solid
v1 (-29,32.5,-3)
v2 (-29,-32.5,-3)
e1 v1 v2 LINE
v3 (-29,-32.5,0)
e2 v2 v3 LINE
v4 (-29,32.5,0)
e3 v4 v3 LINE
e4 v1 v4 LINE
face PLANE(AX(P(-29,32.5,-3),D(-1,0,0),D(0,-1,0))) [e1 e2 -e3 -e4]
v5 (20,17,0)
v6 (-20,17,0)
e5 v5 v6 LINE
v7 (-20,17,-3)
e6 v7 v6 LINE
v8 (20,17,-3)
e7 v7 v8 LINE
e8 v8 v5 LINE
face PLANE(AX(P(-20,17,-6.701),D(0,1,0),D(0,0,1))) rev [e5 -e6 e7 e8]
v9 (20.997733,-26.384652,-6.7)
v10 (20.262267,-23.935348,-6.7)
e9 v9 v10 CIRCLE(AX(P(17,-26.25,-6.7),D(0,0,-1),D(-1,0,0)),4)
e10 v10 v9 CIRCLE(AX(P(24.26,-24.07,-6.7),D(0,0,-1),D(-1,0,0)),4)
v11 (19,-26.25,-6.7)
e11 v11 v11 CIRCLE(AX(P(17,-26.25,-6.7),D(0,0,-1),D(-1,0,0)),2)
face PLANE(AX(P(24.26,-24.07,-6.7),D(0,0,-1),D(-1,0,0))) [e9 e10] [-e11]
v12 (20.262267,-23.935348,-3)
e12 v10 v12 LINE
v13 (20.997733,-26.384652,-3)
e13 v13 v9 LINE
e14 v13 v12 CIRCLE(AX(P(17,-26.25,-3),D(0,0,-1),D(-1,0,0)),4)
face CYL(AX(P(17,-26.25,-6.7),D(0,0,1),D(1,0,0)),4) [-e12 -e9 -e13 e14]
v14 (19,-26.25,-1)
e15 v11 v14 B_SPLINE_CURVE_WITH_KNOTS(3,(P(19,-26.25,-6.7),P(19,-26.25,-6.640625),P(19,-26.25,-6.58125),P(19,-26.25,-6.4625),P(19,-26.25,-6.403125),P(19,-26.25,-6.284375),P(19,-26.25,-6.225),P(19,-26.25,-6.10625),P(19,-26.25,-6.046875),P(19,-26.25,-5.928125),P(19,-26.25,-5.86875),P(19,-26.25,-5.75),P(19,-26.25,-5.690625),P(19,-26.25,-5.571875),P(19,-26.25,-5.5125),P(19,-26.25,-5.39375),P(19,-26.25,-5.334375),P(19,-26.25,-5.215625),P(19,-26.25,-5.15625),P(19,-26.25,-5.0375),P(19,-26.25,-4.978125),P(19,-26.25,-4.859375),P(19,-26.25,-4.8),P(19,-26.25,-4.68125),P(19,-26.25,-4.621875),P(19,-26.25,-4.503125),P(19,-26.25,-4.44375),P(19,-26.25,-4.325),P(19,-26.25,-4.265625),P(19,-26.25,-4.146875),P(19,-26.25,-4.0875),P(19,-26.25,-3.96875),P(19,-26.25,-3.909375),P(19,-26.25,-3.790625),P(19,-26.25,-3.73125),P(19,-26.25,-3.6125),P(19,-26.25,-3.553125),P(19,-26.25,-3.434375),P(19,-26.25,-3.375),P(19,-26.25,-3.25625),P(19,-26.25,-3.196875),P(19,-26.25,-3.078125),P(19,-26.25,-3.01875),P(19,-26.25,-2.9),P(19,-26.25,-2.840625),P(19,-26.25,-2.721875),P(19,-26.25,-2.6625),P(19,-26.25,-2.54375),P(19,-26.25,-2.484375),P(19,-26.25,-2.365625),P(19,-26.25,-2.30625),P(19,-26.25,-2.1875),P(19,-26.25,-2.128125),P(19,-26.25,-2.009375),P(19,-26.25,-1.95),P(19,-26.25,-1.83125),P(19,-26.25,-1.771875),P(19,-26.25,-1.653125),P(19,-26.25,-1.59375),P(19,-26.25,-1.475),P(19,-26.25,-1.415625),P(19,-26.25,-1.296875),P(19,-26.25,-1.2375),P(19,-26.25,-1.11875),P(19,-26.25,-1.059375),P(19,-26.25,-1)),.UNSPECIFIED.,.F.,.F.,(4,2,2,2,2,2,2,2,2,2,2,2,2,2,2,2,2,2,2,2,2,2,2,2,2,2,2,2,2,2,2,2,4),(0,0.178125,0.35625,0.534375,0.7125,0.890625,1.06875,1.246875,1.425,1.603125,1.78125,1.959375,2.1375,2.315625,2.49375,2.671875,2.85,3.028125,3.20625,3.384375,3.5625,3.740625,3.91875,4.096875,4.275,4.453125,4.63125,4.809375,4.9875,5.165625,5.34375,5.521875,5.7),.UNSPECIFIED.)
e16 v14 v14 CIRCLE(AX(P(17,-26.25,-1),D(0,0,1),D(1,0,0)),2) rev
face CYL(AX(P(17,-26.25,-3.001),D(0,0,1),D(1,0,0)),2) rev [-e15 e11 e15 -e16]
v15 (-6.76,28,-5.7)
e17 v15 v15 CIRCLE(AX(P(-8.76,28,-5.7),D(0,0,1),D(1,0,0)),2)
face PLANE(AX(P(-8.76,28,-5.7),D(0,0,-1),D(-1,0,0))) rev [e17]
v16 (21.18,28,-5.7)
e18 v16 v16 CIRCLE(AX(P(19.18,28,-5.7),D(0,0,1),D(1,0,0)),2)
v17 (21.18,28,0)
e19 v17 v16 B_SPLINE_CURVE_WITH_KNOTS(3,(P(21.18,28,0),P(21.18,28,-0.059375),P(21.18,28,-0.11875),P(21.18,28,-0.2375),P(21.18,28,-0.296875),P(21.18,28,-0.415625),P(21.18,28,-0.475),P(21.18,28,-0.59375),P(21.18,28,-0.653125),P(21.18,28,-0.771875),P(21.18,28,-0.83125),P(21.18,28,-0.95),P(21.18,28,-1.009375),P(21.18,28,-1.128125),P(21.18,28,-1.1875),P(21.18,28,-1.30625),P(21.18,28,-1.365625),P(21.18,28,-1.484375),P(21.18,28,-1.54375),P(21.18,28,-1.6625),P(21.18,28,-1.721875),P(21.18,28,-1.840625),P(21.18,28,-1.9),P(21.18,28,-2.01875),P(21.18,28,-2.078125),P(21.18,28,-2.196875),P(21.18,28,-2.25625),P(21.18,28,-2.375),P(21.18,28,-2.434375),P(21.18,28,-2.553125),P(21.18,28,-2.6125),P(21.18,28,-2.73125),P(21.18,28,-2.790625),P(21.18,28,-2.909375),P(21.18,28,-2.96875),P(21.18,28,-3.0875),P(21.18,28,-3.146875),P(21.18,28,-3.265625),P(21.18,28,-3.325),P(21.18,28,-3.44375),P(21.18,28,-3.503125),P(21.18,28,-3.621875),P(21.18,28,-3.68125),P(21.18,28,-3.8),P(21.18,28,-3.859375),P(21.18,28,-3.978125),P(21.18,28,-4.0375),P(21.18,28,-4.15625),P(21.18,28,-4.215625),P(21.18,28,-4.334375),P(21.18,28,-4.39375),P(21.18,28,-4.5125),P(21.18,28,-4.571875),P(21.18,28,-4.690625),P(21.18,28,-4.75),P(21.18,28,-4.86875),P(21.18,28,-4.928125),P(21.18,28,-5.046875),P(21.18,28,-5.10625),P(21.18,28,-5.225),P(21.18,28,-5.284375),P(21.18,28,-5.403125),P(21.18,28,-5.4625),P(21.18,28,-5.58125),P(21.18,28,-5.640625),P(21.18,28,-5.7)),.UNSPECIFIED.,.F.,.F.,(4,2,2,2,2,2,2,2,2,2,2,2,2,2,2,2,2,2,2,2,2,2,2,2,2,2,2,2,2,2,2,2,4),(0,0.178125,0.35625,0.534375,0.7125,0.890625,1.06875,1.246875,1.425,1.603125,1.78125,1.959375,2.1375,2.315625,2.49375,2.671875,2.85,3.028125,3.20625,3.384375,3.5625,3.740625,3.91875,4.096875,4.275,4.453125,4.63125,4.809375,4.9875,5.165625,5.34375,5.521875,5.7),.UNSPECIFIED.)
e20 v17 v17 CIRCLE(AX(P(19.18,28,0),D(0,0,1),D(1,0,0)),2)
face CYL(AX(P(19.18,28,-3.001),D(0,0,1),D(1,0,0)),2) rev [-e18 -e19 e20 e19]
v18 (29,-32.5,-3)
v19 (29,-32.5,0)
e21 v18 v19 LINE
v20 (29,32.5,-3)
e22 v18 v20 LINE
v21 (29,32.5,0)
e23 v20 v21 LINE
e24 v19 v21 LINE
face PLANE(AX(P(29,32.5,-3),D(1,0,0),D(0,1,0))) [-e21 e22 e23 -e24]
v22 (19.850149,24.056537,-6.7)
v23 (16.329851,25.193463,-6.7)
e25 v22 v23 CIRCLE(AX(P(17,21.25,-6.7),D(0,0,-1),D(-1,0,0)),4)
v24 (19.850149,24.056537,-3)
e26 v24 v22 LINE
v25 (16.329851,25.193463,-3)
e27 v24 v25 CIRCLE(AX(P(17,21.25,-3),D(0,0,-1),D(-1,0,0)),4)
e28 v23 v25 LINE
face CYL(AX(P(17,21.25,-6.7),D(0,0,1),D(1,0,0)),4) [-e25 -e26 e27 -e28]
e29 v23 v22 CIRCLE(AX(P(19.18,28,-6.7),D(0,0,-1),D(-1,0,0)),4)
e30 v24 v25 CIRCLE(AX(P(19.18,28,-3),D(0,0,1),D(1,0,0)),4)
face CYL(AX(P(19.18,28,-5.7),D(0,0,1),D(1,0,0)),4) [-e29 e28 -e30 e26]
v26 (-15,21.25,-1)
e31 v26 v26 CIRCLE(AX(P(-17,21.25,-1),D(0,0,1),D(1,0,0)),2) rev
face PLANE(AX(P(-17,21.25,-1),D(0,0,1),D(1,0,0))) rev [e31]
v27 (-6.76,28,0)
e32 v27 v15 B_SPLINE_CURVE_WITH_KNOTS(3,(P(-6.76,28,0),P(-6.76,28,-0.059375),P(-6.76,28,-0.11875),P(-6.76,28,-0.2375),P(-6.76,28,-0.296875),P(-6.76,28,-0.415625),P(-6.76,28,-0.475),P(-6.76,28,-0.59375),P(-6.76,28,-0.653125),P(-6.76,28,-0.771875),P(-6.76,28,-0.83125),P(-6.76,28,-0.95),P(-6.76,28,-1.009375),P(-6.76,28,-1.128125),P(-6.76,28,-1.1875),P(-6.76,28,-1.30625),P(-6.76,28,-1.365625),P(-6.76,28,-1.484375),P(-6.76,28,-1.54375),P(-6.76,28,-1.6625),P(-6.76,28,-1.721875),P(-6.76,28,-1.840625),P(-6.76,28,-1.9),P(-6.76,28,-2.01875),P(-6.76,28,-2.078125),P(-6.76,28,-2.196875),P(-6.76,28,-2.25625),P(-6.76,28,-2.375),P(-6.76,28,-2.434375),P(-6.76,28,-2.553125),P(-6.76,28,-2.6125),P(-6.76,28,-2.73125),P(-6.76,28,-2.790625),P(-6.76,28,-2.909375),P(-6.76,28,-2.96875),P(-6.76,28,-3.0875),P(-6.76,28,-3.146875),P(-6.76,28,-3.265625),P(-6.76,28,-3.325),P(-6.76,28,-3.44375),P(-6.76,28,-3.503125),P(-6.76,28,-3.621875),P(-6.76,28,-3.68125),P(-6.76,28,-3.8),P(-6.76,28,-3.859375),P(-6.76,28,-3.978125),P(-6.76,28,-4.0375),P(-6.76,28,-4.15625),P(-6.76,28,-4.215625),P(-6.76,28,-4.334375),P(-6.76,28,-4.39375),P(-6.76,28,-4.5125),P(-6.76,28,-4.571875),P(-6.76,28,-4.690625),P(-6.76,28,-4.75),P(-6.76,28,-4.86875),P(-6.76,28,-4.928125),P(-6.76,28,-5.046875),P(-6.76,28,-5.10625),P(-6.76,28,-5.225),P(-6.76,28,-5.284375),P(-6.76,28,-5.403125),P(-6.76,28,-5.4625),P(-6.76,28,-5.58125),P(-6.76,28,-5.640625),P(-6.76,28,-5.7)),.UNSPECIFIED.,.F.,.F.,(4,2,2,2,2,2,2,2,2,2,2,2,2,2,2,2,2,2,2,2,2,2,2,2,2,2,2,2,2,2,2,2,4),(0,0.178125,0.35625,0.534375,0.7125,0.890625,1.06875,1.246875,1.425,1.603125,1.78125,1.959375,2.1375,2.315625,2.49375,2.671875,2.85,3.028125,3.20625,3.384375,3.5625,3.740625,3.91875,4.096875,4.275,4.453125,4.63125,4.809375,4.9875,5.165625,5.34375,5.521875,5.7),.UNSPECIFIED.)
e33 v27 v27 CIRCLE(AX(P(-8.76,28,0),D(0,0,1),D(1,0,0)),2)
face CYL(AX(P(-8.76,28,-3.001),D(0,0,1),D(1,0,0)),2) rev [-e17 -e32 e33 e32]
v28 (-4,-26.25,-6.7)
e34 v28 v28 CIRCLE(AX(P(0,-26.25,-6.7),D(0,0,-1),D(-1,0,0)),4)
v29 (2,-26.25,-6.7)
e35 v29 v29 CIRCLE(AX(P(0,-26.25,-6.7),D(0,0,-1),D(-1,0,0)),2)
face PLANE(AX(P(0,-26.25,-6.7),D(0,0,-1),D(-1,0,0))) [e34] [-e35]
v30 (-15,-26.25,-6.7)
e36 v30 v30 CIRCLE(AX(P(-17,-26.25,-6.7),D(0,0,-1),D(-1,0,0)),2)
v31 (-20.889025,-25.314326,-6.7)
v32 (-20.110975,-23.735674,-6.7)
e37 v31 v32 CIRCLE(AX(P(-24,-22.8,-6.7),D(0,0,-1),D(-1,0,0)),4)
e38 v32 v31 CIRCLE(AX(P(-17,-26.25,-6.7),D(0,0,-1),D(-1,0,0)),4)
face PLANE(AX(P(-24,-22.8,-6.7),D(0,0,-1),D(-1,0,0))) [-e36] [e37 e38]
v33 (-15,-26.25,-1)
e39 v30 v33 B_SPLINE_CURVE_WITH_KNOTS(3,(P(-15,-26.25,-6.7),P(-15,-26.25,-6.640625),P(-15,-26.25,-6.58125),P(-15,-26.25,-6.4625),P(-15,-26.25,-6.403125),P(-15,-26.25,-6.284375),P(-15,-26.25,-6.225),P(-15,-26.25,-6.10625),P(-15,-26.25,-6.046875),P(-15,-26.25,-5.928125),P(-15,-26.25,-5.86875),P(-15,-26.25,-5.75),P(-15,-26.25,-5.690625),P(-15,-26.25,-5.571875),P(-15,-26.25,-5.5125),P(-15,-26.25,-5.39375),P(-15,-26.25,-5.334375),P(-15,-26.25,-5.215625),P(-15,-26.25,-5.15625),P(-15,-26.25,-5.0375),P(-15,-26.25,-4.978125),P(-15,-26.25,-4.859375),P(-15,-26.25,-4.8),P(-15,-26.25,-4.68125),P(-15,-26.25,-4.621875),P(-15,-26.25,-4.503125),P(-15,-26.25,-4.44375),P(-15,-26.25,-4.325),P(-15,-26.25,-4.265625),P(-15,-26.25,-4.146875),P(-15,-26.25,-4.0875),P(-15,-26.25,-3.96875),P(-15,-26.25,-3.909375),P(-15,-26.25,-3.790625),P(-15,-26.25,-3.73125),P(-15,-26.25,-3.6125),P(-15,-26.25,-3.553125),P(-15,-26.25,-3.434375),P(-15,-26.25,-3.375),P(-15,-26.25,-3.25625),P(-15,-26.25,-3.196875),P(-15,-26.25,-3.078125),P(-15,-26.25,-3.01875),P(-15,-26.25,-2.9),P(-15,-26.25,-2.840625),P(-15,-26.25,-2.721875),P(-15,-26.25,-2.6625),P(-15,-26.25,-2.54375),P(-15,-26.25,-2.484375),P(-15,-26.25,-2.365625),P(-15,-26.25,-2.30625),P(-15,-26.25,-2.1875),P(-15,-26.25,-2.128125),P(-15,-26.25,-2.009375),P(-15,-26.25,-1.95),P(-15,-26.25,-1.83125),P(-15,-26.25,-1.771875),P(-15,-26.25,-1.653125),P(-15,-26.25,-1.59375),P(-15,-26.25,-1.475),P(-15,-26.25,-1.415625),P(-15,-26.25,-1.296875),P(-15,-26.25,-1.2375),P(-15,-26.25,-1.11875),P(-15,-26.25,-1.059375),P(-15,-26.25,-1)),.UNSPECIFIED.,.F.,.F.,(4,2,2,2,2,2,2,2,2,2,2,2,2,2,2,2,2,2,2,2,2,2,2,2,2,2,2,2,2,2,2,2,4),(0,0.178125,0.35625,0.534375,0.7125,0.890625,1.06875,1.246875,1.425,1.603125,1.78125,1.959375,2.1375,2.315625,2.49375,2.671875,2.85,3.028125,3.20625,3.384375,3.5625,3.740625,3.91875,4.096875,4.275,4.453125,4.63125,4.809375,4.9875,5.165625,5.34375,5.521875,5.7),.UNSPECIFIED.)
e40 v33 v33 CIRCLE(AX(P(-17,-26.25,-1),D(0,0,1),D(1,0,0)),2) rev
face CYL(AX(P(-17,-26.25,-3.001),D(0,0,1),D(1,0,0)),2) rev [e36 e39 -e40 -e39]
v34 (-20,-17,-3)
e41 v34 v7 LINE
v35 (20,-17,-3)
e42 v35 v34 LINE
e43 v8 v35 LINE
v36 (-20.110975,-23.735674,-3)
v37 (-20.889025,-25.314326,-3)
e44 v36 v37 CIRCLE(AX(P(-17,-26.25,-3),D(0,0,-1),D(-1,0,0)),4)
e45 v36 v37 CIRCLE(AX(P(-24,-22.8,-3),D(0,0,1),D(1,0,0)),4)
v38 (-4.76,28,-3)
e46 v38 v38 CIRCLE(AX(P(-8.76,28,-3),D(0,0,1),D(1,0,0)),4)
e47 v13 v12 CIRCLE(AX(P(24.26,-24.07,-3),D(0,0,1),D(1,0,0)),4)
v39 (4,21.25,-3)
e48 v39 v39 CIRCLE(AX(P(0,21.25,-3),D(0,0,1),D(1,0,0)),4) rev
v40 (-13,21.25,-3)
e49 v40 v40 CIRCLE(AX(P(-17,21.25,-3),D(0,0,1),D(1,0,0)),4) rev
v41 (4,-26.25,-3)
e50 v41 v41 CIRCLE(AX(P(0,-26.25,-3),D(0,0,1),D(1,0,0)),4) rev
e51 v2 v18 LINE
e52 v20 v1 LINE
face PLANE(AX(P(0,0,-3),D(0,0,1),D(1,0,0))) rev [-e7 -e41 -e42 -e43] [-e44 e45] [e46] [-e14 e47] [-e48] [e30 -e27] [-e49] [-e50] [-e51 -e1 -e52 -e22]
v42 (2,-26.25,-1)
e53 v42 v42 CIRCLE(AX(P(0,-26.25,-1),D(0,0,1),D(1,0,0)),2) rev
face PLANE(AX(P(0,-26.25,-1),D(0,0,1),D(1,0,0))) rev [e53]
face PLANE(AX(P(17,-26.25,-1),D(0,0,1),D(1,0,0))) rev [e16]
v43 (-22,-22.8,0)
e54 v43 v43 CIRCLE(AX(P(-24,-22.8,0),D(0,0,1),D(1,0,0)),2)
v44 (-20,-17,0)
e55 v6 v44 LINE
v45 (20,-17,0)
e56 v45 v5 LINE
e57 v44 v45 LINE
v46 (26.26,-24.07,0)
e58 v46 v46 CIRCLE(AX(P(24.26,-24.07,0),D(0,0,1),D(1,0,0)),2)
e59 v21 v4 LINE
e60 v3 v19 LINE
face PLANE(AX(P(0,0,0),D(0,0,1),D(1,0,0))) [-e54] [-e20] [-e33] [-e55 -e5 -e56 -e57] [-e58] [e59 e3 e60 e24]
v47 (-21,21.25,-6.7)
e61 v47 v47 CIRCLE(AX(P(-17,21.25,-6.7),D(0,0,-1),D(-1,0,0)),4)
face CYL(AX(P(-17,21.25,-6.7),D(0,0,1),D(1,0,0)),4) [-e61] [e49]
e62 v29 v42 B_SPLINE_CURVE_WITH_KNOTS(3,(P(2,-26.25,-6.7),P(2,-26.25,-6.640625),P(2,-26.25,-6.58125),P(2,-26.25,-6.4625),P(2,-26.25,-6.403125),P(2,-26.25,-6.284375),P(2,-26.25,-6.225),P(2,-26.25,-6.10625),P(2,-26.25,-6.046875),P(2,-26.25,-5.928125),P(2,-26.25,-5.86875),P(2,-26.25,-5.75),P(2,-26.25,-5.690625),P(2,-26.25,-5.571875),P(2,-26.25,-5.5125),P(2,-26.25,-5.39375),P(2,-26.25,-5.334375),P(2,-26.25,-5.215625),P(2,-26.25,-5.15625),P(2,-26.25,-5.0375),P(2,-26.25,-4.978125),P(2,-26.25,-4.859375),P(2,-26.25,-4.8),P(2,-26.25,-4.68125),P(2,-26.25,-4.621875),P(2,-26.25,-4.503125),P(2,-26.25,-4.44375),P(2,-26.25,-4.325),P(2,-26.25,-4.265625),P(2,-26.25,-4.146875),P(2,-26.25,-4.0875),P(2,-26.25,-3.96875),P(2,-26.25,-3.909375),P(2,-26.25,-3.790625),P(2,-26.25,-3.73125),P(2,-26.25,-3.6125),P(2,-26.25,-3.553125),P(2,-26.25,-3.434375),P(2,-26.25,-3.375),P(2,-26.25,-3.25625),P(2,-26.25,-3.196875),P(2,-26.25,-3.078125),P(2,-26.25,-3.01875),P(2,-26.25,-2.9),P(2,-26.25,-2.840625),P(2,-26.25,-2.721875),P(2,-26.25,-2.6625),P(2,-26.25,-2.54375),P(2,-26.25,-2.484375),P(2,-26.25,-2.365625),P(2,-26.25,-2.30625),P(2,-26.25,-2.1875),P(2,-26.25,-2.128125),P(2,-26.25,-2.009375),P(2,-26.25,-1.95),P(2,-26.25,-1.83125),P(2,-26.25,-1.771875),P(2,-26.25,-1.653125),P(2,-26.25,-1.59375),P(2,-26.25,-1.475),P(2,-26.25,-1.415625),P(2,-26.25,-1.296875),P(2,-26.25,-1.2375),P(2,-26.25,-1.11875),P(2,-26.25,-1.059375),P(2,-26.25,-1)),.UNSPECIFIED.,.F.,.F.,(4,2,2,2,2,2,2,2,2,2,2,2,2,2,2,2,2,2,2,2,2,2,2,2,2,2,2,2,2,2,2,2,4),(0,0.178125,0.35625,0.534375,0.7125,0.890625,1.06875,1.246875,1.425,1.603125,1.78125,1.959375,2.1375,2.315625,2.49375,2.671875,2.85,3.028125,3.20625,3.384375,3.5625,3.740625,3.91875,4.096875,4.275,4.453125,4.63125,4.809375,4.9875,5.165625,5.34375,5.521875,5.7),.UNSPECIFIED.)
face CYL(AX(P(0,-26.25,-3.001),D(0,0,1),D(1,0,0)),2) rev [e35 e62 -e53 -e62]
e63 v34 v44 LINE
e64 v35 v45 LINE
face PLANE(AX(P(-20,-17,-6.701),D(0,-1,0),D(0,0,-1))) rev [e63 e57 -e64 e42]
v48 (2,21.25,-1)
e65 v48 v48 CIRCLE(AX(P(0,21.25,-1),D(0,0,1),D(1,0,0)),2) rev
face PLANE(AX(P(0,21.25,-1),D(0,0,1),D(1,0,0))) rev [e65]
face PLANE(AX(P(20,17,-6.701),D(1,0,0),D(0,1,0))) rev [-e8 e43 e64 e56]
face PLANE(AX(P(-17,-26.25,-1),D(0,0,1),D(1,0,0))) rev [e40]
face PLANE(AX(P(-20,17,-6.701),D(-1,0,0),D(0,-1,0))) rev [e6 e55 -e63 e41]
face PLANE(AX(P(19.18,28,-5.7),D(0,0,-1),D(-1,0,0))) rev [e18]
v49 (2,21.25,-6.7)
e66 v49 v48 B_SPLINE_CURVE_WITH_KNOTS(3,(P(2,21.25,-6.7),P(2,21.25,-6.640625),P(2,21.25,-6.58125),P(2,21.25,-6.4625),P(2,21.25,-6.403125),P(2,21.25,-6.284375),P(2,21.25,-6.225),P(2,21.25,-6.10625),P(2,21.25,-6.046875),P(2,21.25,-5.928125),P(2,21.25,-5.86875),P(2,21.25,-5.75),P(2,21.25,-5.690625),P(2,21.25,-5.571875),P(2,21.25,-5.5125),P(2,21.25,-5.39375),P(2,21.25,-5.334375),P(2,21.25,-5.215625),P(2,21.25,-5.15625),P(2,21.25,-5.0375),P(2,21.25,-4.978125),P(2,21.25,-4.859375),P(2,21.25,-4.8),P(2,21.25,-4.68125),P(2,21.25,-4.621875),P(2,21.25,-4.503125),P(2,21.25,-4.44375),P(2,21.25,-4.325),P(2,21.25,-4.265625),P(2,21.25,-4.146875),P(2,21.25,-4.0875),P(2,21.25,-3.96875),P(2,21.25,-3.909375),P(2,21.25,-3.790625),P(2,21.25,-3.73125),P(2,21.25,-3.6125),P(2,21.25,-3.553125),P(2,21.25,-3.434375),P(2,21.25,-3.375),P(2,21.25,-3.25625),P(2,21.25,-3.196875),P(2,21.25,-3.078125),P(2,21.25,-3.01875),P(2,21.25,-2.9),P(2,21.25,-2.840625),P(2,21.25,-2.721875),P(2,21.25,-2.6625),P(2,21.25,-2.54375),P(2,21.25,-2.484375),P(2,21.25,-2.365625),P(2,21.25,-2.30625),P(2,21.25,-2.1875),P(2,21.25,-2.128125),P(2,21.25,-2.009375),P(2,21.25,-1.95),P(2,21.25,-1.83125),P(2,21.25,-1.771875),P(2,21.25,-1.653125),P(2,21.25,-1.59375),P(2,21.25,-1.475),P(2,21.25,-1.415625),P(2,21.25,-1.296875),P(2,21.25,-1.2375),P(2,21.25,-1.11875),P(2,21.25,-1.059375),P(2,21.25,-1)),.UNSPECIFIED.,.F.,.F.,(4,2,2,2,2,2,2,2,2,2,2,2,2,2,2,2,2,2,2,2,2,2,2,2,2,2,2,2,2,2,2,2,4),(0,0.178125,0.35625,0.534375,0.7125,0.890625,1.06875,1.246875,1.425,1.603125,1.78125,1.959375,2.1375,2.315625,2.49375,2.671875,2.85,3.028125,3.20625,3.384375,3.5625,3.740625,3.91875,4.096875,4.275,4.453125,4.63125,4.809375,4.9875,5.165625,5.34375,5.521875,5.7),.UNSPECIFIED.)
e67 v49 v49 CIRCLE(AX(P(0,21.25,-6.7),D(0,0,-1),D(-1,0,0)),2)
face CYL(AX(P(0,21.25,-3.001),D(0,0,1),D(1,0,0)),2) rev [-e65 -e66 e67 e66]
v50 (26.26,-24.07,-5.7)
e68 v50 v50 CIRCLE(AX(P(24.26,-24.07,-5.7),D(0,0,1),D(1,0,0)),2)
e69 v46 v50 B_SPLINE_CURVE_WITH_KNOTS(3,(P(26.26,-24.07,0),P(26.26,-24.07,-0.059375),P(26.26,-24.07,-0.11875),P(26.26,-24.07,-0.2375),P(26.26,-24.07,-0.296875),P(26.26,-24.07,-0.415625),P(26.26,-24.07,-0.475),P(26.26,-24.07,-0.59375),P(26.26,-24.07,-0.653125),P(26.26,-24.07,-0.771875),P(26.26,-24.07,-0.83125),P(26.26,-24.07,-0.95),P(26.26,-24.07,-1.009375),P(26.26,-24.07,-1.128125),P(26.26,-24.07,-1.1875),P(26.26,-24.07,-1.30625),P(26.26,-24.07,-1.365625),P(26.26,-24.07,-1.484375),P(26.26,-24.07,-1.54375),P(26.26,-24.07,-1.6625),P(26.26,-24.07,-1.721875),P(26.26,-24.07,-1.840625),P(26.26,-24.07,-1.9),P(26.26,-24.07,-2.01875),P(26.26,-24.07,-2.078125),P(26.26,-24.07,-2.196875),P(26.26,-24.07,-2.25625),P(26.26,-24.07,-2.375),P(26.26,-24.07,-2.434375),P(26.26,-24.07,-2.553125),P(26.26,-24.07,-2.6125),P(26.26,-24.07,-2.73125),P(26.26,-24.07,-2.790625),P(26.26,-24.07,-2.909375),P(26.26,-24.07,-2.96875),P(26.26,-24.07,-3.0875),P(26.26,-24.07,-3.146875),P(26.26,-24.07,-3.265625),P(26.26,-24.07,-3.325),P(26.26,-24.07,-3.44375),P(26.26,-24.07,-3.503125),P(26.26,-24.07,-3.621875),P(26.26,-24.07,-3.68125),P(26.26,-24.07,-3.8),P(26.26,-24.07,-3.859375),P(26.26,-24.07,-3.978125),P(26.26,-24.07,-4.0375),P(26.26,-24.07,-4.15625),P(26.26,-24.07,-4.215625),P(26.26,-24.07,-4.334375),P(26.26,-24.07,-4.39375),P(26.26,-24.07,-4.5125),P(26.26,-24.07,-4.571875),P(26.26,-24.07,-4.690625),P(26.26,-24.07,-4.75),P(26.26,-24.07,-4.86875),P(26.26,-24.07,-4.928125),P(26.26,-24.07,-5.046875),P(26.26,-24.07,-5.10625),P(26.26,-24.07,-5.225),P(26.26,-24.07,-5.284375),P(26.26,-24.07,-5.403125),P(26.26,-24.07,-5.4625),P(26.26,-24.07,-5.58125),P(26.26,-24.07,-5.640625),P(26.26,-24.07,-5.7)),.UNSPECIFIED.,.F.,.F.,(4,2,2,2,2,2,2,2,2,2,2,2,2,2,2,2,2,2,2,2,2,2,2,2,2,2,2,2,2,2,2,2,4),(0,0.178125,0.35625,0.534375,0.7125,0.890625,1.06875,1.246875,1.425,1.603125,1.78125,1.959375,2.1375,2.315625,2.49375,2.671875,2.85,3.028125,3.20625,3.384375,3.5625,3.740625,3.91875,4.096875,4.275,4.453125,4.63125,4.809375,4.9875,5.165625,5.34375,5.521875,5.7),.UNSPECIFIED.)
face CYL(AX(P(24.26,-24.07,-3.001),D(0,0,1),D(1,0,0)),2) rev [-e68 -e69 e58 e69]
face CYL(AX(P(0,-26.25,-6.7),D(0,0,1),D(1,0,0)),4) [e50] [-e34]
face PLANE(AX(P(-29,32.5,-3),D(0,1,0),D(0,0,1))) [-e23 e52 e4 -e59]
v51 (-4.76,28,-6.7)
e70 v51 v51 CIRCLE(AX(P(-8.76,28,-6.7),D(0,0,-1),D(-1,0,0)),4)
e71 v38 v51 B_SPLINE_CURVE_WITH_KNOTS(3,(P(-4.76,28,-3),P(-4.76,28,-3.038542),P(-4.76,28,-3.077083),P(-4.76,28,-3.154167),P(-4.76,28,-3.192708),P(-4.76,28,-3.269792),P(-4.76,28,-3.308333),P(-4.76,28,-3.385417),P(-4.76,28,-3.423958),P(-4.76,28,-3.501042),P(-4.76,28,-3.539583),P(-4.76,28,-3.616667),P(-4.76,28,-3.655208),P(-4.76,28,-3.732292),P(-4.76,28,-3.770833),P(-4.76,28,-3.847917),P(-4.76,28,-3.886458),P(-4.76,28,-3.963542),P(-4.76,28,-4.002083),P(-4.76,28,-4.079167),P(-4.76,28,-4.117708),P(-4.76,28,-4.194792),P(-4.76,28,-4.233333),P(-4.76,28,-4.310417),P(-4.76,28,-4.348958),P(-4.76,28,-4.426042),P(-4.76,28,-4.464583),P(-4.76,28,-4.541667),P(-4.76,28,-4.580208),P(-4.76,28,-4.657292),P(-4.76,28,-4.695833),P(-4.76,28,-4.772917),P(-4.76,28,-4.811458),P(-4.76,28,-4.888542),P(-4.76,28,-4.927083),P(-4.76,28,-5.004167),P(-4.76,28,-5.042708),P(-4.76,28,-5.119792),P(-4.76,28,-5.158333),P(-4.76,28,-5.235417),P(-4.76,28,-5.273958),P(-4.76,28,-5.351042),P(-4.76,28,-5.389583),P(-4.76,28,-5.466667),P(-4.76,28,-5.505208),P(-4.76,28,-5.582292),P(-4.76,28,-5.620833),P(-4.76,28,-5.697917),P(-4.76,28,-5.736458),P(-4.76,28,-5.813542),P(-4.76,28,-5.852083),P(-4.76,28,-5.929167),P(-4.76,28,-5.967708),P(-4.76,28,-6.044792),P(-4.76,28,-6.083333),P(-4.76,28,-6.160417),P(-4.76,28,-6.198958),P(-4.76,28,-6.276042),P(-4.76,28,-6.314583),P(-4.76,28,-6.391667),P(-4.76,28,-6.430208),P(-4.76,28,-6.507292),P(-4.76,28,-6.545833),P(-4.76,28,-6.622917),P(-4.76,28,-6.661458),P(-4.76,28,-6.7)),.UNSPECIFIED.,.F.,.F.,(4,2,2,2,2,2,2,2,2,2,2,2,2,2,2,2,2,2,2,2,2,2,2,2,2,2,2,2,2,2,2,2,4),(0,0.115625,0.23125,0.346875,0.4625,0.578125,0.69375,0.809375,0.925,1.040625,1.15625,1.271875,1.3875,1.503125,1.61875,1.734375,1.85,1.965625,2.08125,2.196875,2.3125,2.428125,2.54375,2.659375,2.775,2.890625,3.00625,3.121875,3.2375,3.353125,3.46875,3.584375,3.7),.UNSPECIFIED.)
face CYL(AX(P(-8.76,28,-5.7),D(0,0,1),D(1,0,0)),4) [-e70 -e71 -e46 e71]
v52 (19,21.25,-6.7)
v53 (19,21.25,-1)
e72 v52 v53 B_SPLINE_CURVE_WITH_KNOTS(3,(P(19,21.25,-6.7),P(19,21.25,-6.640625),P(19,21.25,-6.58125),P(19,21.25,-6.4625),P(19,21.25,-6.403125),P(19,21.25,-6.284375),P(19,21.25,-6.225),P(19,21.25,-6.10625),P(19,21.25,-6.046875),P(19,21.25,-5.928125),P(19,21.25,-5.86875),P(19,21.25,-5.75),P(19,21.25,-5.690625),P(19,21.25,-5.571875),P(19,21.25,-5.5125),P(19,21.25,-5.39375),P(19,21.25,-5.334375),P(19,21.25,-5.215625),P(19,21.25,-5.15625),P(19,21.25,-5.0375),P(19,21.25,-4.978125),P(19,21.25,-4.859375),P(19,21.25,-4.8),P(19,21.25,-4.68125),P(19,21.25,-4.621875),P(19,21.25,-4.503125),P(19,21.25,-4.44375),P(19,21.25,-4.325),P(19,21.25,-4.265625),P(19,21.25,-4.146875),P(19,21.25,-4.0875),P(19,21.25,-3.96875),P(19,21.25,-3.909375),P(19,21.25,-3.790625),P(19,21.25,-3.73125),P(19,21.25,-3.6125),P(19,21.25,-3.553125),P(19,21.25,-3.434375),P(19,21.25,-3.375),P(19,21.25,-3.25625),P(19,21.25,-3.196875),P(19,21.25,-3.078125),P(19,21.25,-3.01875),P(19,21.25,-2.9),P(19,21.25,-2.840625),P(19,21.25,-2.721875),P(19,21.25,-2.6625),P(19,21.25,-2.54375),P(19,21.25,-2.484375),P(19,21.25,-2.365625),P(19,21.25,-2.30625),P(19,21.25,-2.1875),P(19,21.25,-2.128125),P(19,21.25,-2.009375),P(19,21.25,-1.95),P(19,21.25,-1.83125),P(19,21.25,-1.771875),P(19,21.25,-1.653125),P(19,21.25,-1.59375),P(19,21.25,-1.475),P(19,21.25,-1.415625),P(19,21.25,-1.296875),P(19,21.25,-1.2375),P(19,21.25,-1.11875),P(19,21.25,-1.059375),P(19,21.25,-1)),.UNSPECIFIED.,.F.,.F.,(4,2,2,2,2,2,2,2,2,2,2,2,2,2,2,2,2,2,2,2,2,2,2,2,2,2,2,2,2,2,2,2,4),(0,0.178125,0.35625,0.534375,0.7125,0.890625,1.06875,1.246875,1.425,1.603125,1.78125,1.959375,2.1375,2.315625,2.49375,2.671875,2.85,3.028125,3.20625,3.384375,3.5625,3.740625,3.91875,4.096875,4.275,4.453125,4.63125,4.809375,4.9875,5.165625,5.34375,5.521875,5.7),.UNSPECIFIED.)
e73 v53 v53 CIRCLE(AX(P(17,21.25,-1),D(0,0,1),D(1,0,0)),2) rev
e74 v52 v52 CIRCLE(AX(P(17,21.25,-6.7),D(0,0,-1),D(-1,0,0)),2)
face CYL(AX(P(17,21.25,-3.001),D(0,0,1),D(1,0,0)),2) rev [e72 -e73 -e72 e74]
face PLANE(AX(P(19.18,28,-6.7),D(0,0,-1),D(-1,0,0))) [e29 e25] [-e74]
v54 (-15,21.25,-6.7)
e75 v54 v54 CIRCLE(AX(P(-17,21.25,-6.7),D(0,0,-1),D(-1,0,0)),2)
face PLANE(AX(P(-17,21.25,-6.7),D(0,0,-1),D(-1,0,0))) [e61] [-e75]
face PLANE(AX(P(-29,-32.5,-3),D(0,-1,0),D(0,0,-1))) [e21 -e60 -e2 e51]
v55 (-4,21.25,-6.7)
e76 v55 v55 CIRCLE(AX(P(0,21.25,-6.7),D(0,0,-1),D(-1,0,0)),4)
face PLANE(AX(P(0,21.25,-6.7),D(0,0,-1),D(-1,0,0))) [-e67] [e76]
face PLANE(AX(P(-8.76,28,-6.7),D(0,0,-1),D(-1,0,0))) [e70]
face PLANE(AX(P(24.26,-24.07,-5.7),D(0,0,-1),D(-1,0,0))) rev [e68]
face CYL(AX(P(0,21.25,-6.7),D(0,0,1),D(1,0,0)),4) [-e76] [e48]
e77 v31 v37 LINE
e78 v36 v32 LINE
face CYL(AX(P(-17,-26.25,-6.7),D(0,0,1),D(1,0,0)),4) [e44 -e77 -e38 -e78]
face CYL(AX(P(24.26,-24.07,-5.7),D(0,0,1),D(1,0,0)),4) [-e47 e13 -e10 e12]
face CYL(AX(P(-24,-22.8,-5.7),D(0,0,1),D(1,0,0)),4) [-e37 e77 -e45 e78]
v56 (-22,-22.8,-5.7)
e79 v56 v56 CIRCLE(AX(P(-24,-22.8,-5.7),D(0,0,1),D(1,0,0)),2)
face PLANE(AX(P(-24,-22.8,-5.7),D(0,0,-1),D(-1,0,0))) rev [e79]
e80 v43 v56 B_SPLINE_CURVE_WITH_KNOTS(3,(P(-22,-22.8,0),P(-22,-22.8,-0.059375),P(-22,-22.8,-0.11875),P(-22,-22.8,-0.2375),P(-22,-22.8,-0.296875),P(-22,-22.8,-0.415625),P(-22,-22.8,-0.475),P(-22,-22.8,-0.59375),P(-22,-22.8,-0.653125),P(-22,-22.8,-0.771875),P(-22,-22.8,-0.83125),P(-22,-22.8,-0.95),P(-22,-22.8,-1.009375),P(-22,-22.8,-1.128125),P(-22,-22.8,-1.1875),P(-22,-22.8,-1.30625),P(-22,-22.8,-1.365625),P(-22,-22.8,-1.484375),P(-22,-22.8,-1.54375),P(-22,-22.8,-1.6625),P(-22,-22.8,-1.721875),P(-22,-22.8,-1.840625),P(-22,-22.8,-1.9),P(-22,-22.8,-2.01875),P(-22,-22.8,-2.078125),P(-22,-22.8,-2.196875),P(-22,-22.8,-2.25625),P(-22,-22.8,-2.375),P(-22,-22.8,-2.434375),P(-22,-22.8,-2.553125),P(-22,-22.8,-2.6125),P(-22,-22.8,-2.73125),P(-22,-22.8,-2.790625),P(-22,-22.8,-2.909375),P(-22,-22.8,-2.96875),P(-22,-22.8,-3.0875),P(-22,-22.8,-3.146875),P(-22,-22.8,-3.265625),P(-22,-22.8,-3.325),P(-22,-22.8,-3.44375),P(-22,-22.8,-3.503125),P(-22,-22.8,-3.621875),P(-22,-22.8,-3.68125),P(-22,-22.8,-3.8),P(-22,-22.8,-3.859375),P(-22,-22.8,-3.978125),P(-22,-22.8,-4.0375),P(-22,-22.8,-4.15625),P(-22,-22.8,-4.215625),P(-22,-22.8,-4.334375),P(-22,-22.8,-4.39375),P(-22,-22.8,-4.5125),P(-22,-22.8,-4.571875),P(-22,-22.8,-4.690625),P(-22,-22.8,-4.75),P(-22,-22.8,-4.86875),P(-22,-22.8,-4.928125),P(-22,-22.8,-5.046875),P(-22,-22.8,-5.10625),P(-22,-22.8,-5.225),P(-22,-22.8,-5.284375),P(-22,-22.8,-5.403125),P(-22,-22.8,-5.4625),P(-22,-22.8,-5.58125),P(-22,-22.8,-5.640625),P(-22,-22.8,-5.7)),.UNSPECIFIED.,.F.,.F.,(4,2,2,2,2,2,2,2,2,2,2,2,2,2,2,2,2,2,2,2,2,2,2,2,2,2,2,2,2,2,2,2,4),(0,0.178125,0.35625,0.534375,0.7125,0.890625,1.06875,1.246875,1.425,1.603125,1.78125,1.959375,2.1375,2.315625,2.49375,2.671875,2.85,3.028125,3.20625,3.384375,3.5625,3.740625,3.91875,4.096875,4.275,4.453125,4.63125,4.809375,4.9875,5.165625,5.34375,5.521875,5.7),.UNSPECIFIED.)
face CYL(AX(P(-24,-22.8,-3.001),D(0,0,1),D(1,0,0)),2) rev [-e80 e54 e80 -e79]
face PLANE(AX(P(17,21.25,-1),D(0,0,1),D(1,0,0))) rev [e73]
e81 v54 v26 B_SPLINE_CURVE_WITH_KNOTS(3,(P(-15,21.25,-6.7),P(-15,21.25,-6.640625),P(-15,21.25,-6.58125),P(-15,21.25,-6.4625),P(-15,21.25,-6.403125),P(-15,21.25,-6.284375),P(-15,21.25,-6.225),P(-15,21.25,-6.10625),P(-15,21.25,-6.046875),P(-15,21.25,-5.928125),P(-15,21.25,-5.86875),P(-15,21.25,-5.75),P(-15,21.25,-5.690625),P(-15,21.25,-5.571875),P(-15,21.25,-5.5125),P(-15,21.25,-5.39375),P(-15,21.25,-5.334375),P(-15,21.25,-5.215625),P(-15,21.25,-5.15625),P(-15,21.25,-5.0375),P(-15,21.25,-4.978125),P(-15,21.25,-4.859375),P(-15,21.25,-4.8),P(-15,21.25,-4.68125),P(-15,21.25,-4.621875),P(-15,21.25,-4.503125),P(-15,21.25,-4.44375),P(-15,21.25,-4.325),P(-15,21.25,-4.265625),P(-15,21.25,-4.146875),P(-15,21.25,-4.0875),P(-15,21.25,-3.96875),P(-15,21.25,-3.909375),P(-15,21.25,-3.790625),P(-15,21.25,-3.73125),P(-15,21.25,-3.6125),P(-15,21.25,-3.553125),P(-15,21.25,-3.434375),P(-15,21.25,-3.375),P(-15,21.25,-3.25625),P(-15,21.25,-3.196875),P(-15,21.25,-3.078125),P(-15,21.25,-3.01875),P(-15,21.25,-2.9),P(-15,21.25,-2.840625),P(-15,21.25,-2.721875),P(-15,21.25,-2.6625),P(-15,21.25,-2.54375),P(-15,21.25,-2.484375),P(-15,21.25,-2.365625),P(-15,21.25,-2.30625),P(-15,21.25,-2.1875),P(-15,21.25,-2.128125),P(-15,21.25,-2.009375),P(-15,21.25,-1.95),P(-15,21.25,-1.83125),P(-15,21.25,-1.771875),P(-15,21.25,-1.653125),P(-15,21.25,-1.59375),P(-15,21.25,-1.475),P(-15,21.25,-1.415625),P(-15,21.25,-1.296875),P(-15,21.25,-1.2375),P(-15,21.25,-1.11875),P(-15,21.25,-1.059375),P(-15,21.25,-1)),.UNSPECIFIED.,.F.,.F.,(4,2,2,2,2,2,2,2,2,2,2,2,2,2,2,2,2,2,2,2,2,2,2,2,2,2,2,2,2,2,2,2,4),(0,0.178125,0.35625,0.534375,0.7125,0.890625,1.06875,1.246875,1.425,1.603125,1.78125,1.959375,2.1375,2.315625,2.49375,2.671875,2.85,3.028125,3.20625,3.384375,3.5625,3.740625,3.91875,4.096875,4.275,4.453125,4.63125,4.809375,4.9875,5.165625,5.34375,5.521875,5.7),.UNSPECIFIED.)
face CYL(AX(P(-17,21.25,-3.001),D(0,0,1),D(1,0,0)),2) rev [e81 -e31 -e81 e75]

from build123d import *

# Parameters (mm, degrees)
ESQUISSE1_W               = 58
ESQUISSE1_H               = 65
T_LE_DE_BASE_PLI_E1_DEPTH = 3
ENL_V_MAT_EXTRU_1_REACH   = 45.661
ESQUISSE6_R               = 2
ENL_V_MAT_EXTRU_2_REACH   = 45.661
ESQUISSE7_R               = 2
ESQUISSE8_R               = 4
ESQUISSE8_R_2             = 2
BOSS_EXTRU_1_DEPTH        = 2.7
ESQUISSE11_R              = 4
BOSS_EXTRU_3_DEPTH        = 1
ENL_V_MAT_EXTRU_3_REACH   = 46.07
ESQUISSE9_W               = 40
ESQUISSE9_H               = 34
ESQUISSE12_R              = 4
ESQUISSE12_R_2            = 2
BOSS_EXTRU_4_DEPTH        = 3.7
ESQUISSE13_R              = 2
BOSS_EXTRU_5_DEPTH        = 1


# Sheet-metal steps are written as plain solids
with BuildPart() as part:
    # Esquisse1 → Tôle de base pliée1 (new body)
    with BuildSketch(Plane.XY):
        Rectangle(ESQUISSE1_W, ESQUISSE1_H)
    extrude(amount=-T_LE_DE_BASE_PLI_E1_DEPTH)

    # Esquisse6 → Enlèv. mat.-Extru.1 (cut, up to next)
    with BuildSketch(Plane.XY, mode=Mode.PRIVATE) as enl_v_mat_extru_1_sk1:
        with Locations((-8.76, 28)):
            Circle(ESQUISSE6_R)
    enl_v_mat_extru_1_tool1 = extrude(enl_v_mat_extru_1_sk1.sketch, amount=-ENL_V_MAT_EXTRU_1_REACH, mode=Mode.PRIVATE) & part.part
    # Esquisse6 → Enlèv. mat.-Extru.1 (cut, up to next)
    with BuildSketch(Plane.XY, mode=Mode.PRIVATE) as enl_v_mat_extru_1_sk2:
        with Locations((19.18, 28)):
            Circle(ESQUISSE6_R)
    enl_v_mat_extru_1_tool2 = extrude(enl_v_mat_extru_1_sk2.sketch, amount=-ENL_V_MAT_EXTRU_1_REACH, mode=Mode.PRIVATE) & part.part
    # Esquisse6 → Enlèv. mat.-Extru.1 (cut, up to next)
    with BuildSketch(Plane.XY, mode=Mode.PRIVATE) as enl_v_mat_extru_1_sk3:
        with Locations((-24, -22.8)):
            Circle(ESQUISSE6_R)
    enl_v_mat_extru_1_tool3 = extrude(enl_v_mat_extru_1_sk3.sketch, amount=-ENL_V_MAT_EXTRU_1_REACH, mode=Mode.PRIVATE) & part.part
    # Esquisse6 → Enlèv. mat.-Extru.1 (cut, up to next)
    with BuildSketch(Plane.XY, mode=Mode.PRIVATE) as enl_v_mat_extru_1_sk4:
        with Locations((24.26, -24.07)):
            Circle(ESQUISSE6_R)
    enl_v_mat_extru_1_tool4 = extrude(enl_v_mat_extru_1_sk4.sketch, amount=-ENL_V_MAT_EXTRU_1_REACH, mode=Mode.PRIVATE) & part.part
    add(enl_v_mat_extru_1_tool1.solids().sort_by_distance((-8.76, 28, 0))[0], mode=Mode.SUBTRACT)
    add(enl_v_mat_extru_1_tool2.solids().sort_by_distance((19.18, 28, 0))[0], mode=Mode.SUBTRACT)
    add(enl_v_mat_extru_1_tool3.solids().sort_by_distance((-24, -22.8, 0))[0], mode=Mode.SUBTRACT)
    add(enl_v_mat_extru_1_tool4.solids().sort_by_distance((24.26, -24.07, 0))[0], mode=Mode.SUBTRACT)

    # Esquisse7 → Enlèv. mat.-Extru.2 (cut, up to next)
    with BuildSketch(Plane.XY, mode=Mode.PRIVATE) as enl_v_mat_extru_2_sk1:
        with Locations((-17, -26.25)):
            Circle(ESQUISSE7_R)
    enl_v_mat_extru_2_tool1 = extrude(enl_v_mat_extru_2_sk1.sketch, amount=-ENL_V_MAT_EXTRU_2_REACH, mode=Mode.PRIVATE) & part.part
    # Esquisse7 → Enlèv. mat.-Extru.2 (cut, up to next)
    with BuildSketch(Plane.XY, mode=Mode.PRIVATE) as enl_v_mat_extru_2_sk2:
        with Locations((0, -26.25)):
            Circle(ESQUISSE7_R)
    enl_v_mat_extru_2_tool2 = extrude(enl_v_mat_extru_2_sk2.sketch, amount=-ENL_V_MAT_EXTRU_2_REACH, mode=Mode.PRIVATE) & part.part
    # Esquisse7 → Enlèv. mat.-Extru.2 (cut, up to next)
    with BuildSketch(Plane.XY, mode=Mode.PRIVATE) as enl_v_mat_extru_2_sk3:
        with Locations((17, -26.25)):
            Circle(ESQUISSE7_R)
    enl_v_mat_extru_2_tool3 = extrude(enl_v_mat_extru_2_sk3.sketch, amount=-ENL_V_MAT_EXTRU_2_REACH, mode=Mode.PRIVATE) & part.part
    # Esquisse7 → Enlèv. mat.-Extru.2 (cut, up to next)
    with BuildSketch(Plane.XY, mode=Mode.PRIVATE) as enl_v_mat_extru_2_sk4:
        with Locations((0, 21.25)):
            Circle(ESQUISSE7_R)
    enl_v_mat_extru_2_tool4 = extrude(enl_v_mat_extru_2_sk4.sketch, amount=-ENL_V_MAT_EXTRU_2_REACH, mode=Mode.PRIVATE) & part.part
    # Esquisse7 → Enlèv. mat.-Extru.2 (cut, up to next)
    with BuildSketch(Plane.XY, mode=Mode.PRIVATE) as enl_v_mat_extru_2_sk5:
        with Locations((17, 21.25)):
            Circle(ESQUISSE7_R)
    enl_v_mat_extru_2_tool5 = extrude(enl_v_mat_extru_2_sk5.sketch, amount=-ENL_V_MAT_EXTRU_2_REACH, mode=Mode.PRIVATE) & part.part
    # Esquisse7 → Enlèv. mat.-Extru.2 (cut, up to next)
    with BuildSketch(Plane.XY, mode=Mode.PRIVATE) as enl_v_mat_extru_2_sk6:
        with Locations((-17, 21.25)):
            Circle(ESQUISSE7_R)
    enl_v_mat_extru_2_tool6 = extrude(enl_v_mat_extru_2_sk6.sketch, amount=-ENL_V_MAT_EXTRU_2_REACH, mode=Mode.PRIVATE) & part.part
    add(enl_v_mat_extru_2_tool1.solids().sort_by_distance((-17, -26.25, 0))[0], mode=Mode.SUBTRACT)
    add(enl_v_mat_extru_2_tool2.solids().sort_by_distance((0, -26.25, 0))[0], mode=Mode.SUBTRACT)
    add(enl_v_mat_extru_2_tool3.solids().sort_by_distance((17, -26.25, 0))[0], mode=Mode.SUBTRACT)
    add(enl_v_mat_extru_2_tool4.solids().sort_by_distance((0, 21.25, 0))[0], mode=Mode.SUBTRACT)
    add(enl_v_mat_extru_2_tool5.solids().sort_by_distance((17, 21.25, 0))[0], mode=Mode.SUBTRACT)
    add(enl_v_mat_extru_2_tool6.solids().sort_by_distance((-17, 21.25, 0))[0], mode=Mode.SUBTRACT)

    # Esquisse8 → Boss.-Extru.1 (add)
    # profile 1 of 4: a face of its own
    with BuildSketch(Plane.XY.offset(-3)):
        with Locations((-8.76, 28)):
            Circle(ESQUISSE8_R)
        with Locations((-8.76, 28)):
            Circle(ESQUISSE8_R_2, mode=Mode.SUBTRACT)
    # profile 2 of 4: a face of its own
    with BuildSketch(Plane.XY.offset(-3)):
        with Locations((19.18, 28)):
            Circle(ESQUISSE8_R)
        with Locations((19.18, 28)):
            Circle(ESQUISSE8_R_2, mode=Mode.SUBTRACT)
    # profile 3 of 4: a face of its own
    with BuildSketch(Plane.XY.offset(-3)):
        with Locations((24.26, -24.07)):
            Circle(ESQUISSE8_R)
        with Locations((24.26, -24.07)):
            Circle(ESQUISSE8_R_2, mode=Mode.SUBTRACT)
    # profile 4 of 4: a face of its own
    with BuildSketch(Plane.XY.offset(-3)):
        with Locations((-24, -22.8)):
            Circle(ESQUISSE8_R)
        with Locations((-24, -22.8)):
            Circle(ESQUISSE8_R_2, mode=Mode.SUBTRACT)
    extrude(amount=-BOSS_EXTRU_1_DEPTH)

    # Esquisse11 → Boss.-Extru.3 (add)
    with BuildSketch(Plane(origin=(0, 0, -5.7), x_dir=(-1, 0, 0), z_dir=(0, 0, -1))):
        with Locations(Location((24, -22.8, 0), (0, 0, 180))):
            Circle(ESQUISSE11_R)
        with Locations(Location((8.76, 28, 0), (0, 0, 180))):
            Circle(ESQUISSE11_R)
        with Locations(Location((-24.26, -24.07, 0), (0, 0, 180))):
            Circle(ESQUISSE11_R)
        with Locations(Location((-19.18, 28, 0), (0, 0, 180))):
            Circle(ESQUISSE11_R)
    extrude(amount=BOSS_EXTRU_3_DEPTH)

    # Esquisse9 → Enlèv. mat.-Extru.3 (cut, up to next)
    with BuildSketch(Plane.XY, mode=Mode.PRIVATE) as enl_v_mat_extru_3_sk1:
        Rectangle(ESQUISSE9_W, ESQUISSE9_H)
    enl_v_mat_extru_3_tool1 = extrude(enl_v_mat_extru_3_sk1.sketch, amount=-ENL_V_MAT_EXTRU_3_REACH, mode=Mode.PRIVATE) & part.part
    add(enl_v_mat_extru_3_tool1.solids().sort_by_distance((0, 0, 0))[0], mode=Mode.SUBTRACT)

    # Esquisse12 → Boss.-Extru.4 (add)
    # profile 1 of 6: a face of its own
    with BuildSketch(Plane(origin=(0, 0, -3), x_dir=(-1, 0, 0), z_dir=(0, 0, -1))):
        with Locations((-17, 21.25)):
            Circle(ESQUISSE12_R)
        with Locations(Location((-17, 21.25, 0), (0, 0, 180))):
            Circle(ESQUISSE12_R_2, mode=Mode.SUBTRACT)
    # profile 2 of 6: a face of its own
    with BuildSketch(Plane(origin=(0, 0, -3), x_dir=(-1, 0, 0), z_dir=(0, 0, -1))):
        with Locations(Location((0, 21.25, 0), (0, 0, 180))):
            Circle(ESQUISSE12_R)
        with Locations(Location((0, 21.25, 0), (0, 0, 180))):
            Circle(ESQUISSE12_R_2, mode=Mode.SUBTRACT)
    # profile 3 of 6: a face of its own
    with BuildSketch(Plane(origin=(0, 0, -3), x_dir=(-1, 0, 0), z_dir=(0, 0, -1))):
        with Locations(Location((17, 21.25, 0), (0, 0, 180))):
            Circle(ESQUISSE12_R)
        with Locations(Location((17, 21.25, 0), (0, 0, 180))):
            Circle(ESQUISSE12_R_2, mode=Mode.SUBTRACT)
    # profile 4 of 6: a face of its own
    with BuildSketch(Plane(origin=(0, 0, -3), x_dir=(-1, 0, 0), z_dir=(0, 0, -1))):
        with Locations((17, -26.25)):
            Circle(ESQUISSE12_R)
        with Locations(Location((17, -26.25, 0), (0, 0, 180))):
            Circle(ESQUISSE12_R_2, mode=Mode.SUBTRACT)
    # profile 5 of 6: a face of its own
    with BuildSketch(Plane(origin=(0, 0, -3), x_dir=(-1, 0, 0), z_dir=(0, 0, -1))):
        with Locations(Location((0, -26.25, 0), (0, 0, 180))):
            Circle(ESQUISSE12_R)
        with Locations(Location((0, -26.25, 0), (0, 0, 180))):
            Circle(ESQUISSE12_R_2, mode=Mode.SUBTRACT)
    # profile 6 of 6: a face of its own
    with BuildSketch(Plane(origin=(0, 0, -3), x_dir=(-1, 0, 0), z_dir=(0, 0, -1))):
        with Locations((-17, -26.25)):
            Circle(ESQUISSE12_R)
        with Locations(Location((-17, -26.25, 0), (0, 0, 180))):
            Circle(ESQUISSE12_R_2, mode=Mode.SUBTRACT)
    extrude(amount=BOSS_EXTRU_4_DEPTH)

    # Esquisse13 → Boss.-Extru.5 (add)
    with BuildSketch(Plane.XY):
        with Locations((-17, 21.25)):
            Circle(ESQUISSE13_R)
        with Locations((-17, -26.25)):
            Circle(ESQUISSE13_R)
        with Locations((0, 21.25)):
            Circle(ESQUISSE13_R)
        with Locations((0, -26.25)):
            Circle(ESQUISSE13_R)
        with Locations((17, -26.25)):
            Circle(ESQUISSE13_R)
        with Locations((17, 21.25)):
            Circle(ESQUISSE13_R)
    extrude(amount=-BOSS_EXTRU_5_DEPTH)


solid = part.part
